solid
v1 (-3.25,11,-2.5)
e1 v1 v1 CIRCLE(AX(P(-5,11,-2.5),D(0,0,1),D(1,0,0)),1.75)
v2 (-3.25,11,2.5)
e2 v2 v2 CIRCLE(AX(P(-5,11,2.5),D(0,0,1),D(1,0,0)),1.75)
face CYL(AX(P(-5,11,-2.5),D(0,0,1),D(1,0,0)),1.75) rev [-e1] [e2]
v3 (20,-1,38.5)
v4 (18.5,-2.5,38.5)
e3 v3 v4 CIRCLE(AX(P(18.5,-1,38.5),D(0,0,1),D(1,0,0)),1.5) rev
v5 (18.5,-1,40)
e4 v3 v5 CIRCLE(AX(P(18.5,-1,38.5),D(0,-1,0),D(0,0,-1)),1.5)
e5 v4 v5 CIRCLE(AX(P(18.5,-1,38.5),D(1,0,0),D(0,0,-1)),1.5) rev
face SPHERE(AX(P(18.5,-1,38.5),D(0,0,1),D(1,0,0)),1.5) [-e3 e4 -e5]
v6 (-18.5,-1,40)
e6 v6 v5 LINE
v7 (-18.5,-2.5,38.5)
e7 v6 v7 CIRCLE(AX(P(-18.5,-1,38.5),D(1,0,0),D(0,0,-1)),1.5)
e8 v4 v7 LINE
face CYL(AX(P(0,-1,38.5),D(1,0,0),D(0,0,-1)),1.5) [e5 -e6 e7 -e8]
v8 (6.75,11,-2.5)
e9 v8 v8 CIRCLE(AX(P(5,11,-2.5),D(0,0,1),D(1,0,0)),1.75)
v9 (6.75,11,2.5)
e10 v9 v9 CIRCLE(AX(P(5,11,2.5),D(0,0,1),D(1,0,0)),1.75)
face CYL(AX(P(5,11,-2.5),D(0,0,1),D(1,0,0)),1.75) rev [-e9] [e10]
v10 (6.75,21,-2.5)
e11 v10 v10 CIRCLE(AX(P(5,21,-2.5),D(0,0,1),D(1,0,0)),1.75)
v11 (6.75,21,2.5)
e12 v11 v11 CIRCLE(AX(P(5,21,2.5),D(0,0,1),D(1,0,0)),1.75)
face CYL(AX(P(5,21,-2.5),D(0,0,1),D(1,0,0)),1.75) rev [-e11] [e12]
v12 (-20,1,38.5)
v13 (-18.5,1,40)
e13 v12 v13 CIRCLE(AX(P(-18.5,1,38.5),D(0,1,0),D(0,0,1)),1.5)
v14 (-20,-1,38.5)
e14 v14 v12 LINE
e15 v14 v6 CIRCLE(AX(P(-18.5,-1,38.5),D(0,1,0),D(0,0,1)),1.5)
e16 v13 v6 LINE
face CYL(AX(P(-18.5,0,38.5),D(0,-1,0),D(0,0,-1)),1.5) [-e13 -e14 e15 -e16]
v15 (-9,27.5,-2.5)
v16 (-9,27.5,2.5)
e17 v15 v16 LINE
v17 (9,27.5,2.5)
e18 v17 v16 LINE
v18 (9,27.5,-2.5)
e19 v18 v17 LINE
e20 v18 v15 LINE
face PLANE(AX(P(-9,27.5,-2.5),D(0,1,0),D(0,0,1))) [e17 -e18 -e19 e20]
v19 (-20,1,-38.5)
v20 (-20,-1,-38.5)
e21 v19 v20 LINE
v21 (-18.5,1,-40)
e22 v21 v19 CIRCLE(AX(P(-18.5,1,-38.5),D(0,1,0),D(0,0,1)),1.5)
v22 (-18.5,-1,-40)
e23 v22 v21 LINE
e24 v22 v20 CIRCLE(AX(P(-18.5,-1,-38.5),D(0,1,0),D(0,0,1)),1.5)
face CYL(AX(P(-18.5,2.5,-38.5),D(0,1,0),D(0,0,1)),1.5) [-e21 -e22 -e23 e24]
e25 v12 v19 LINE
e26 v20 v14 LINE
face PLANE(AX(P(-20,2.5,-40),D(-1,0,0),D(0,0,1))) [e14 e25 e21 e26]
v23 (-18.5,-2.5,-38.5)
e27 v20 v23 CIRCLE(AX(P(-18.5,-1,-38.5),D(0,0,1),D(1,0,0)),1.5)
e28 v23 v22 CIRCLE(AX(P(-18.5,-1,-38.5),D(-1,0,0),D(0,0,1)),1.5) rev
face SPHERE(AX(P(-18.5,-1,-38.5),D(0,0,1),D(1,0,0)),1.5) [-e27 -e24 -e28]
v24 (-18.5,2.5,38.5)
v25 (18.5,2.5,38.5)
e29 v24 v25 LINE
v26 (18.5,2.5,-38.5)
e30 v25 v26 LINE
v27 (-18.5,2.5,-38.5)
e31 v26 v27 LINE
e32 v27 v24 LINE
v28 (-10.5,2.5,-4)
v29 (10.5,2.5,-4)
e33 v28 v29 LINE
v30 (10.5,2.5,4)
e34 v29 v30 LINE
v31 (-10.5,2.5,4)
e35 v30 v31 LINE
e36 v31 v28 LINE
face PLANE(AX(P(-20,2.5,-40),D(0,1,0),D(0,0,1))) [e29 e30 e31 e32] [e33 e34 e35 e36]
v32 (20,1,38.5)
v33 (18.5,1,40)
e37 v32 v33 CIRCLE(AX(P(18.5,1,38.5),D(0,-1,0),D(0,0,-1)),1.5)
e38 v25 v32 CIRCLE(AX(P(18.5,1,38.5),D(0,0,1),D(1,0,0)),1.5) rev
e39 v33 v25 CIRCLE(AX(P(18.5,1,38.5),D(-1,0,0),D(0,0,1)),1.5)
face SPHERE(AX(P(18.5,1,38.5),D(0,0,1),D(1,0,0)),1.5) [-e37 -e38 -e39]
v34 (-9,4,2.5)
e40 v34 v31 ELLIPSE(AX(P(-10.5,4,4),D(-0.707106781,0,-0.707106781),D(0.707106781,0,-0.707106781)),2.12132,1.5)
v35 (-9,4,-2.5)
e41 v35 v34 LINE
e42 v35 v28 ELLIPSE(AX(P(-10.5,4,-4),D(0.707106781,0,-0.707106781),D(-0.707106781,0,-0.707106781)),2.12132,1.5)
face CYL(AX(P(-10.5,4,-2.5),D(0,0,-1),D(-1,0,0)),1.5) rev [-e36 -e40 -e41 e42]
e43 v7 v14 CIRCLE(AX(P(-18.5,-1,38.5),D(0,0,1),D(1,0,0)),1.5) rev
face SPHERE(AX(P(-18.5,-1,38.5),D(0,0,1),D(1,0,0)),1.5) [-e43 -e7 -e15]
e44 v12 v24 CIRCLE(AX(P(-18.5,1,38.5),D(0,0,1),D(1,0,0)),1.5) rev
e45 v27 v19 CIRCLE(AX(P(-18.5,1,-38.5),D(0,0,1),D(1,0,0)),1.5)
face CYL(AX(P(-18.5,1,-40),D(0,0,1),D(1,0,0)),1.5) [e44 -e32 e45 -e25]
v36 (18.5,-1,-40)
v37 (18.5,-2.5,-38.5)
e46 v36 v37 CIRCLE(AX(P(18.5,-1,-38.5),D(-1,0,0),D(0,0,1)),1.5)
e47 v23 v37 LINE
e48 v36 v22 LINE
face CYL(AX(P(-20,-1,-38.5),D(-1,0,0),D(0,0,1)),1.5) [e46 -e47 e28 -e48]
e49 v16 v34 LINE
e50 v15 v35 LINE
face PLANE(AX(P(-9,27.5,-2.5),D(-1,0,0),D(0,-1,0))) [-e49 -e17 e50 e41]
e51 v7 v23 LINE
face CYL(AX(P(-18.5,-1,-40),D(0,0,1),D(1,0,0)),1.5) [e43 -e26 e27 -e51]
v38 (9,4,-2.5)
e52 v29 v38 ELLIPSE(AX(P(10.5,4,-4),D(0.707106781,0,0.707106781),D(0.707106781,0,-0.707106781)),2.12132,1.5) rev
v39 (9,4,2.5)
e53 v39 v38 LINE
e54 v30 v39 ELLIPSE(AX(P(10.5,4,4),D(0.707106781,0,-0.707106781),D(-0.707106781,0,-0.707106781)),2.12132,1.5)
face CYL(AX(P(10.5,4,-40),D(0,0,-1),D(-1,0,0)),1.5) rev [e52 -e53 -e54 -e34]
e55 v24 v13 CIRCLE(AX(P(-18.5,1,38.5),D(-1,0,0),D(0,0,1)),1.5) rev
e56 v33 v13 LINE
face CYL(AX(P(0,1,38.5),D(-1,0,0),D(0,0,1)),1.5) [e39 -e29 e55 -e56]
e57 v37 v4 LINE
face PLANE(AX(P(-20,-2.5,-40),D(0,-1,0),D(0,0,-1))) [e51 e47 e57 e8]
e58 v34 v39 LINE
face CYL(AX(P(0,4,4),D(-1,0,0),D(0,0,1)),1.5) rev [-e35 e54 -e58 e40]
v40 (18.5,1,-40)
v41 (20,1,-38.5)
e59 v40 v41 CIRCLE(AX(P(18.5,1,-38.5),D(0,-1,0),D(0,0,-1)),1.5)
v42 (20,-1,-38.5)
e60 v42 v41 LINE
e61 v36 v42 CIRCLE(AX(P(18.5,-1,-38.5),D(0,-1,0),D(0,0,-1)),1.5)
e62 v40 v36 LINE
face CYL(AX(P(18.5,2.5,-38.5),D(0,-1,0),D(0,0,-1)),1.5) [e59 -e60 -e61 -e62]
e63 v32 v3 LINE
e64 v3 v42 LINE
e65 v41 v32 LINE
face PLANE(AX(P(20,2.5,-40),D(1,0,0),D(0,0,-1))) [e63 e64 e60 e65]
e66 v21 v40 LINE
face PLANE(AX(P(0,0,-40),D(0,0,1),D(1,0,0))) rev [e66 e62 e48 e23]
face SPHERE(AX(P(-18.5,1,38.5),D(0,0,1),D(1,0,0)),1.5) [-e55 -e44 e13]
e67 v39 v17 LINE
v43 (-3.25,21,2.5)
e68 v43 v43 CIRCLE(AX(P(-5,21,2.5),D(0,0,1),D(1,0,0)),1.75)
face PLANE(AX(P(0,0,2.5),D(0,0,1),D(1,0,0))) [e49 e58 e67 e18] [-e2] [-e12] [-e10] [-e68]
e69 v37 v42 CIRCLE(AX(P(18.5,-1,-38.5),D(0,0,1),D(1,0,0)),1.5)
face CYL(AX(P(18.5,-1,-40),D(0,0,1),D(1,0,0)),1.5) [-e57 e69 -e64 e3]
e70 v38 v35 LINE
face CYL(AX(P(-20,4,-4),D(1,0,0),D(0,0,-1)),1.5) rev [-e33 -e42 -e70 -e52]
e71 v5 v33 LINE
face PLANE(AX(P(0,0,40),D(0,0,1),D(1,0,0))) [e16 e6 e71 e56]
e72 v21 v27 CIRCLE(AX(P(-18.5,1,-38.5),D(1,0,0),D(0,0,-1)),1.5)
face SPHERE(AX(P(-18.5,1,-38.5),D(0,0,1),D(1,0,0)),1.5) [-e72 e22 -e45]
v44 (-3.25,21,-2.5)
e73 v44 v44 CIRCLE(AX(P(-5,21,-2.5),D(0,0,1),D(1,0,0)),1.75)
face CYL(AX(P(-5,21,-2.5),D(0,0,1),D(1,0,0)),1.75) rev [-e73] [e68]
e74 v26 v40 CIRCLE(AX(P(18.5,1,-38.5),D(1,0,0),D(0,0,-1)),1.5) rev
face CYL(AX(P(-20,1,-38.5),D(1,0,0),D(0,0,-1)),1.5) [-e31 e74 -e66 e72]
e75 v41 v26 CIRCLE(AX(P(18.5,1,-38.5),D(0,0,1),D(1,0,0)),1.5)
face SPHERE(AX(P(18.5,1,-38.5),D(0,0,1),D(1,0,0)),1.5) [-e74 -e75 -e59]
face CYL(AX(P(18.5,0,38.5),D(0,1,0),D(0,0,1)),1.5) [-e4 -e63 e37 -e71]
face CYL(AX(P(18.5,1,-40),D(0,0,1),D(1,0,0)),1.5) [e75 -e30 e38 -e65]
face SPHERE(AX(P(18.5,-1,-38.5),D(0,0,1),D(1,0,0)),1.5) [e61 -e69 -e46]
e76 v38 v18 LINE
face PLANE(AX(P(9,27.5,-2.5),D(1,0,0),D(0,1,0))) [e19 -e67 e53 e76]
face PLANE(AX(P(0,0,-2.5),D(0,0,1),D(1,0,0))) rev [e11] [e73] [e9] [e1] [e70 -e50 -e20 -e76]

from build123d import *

# Parameters (mm, degrees)
BOSS_EXTRUDE1_DEPTH      = 40
BOSS_EXTRUDE1_DEPTH_BACK = 40
SKETCH1_W                = 40
SKETCH1_H                = 5
BOSS_EXTRUDE2_DEPTH      = 2.5
BOSS_EXTRUDE2_DEPTH_BACK = 2.5
SKETCH2_W                = 18
SKETCH2_H                = 25
SKETCH2_R                = 1.75
FILLET1_R                = 1.5
FILLET2_R                = 1.5
FILLET3_R                = 1.5


with BuildPart() as part:
    # Sketch1 → Boss-Extrude1 (new, two sides: drawn at the far end of the back side and taken through both)
    with BuildSketch(Plane.XY.offset(-BOSS_EXTRUDE1_DEPTH_BACK)):
        Rectangle(SKETCH1_W, SKETCH1_H)
    extrude(amount=BOSS_EXTRUDE1_DEPTH + BOSS_EXTRUDE1_DEPTH_BACK)

    # Sketch2 → Boss-Extrude2 (add, two sides: drawn at the far end of the back side and taken through both)
    with BuildSketch(Plane.XY.offset(-BOSS_EXTRUDE2_DEPTH_BACK)):
        with Locations((0, 15)):
            Rectangle(SKETCH2_W, SKETCH2_H)
        with Locations((-5, 11)):
            Circle(SKETCH2_R, mode=Mode.SUBTRACT)
        with Locations((5, 11)):
            Circle(SKETCH2_R, mode=Mode.SUBTRACT)
        with Locations((5, 21)):
            Circle(SKETCH2_R, mode=Mode.SUBTRACT)
        with Locations((-5, 21)):
            Circle(SKETCH2_R, mode=Mode.SUBTRACT)
    extrude(amount=BOSS_EXTRUDE2_DEPTH + BOSS_EXTRUDE2_DEPTH_BACK)

    # Fillet1
    fillet1_edges = [part.edges().sort_by_distance(p)[0] for p in [
        (0, 2.5, 40),
        (0, -2.5, 40),
        (0, -2.5, -40),
        (9, 2.5, 0),
        (0, 2.5, -2.5),
        (-9, 2.5, 0),
        (0, 2.5, 2.5),
        (20, -2.5, 0),
        (-20, -2.5, 0),
        (-20, 2.5, 0),
        (20, 2.5, 0),
        (0, 2.5, -40),
    ]]
    fillet(fillet1_edges, radius=FILLET1_R)

    # Fillet2
    # the kernel refuses this fillet: 1.5 mm, written as the material it takes off along each edge
    with BuildSketch(Plane(origin=(18.5, 1, 38.5), x_dir=(1, 0, 0), z_dir=(0, 0, 1))) as fillet2_piece_1_section:
        Polygon((0, 0), (FILLET2_R, 0), (FILLET2_R, FILLET2_R), (0, FILLET2_R), align=None)
    fillet2_piece_1 = extrude(amount=FILLET2_R, mode=Mode.PRIVATE)
    fillet2_piece_1 = fillet2_piece_1 - Plane(origin=(18.5, 1, 38.5), x_dir=(-0.7071067811865475, -0.7071067811865475, 0), z_dir=(0, 0, 1)) * Sphere(FILLET2_R, mode=Mode.PRIVATE)
    add(fillet2_piece_1, mode=Mode.SUBTRACT)
    with BuildSketch(Plane(origin=(-18.5, 1, 38.5), x_dir=(-1, 0, 0), z_dir=(0, 0, 1))) as fillet2_piece_2_section:
        Polygon((0, 0), (FILLET2_R, 0), (FILLET2_R, -FILLET2_R), (0, -FILLET2_R), align=None)
    fillet2_piece_2 = extrude(amount=FILLET2_R, mode=Mode.PRIVATE)
    fillet2_piece_2 = fillet2_piece_2 - Plane(origin=(-18.5, 1, 38.5), x_dir=(0.7071067811865475, -0.7071067811865475, 0), z_dir=(0, 0, 1)) * Sphere(FILLET2_R, mode=Mode.PRIVATE)
    add(fillet2_piece_2, mode=Mode.SUBTRACT)
    with BuildSketch(Plane(origin=(-18.5, -1, 38.5), x_dir=(-1, 0, 0), z_dir=(0, 0, 1))) as fillet2_piece_3_section:
        Polygon((0, 0), (FILLET2_R, 0), (FILLET2_R, FILLET2_R), (0, FILLET2_R), align=None)
    fillet2_piece_3 = extrude(amount=FILLET2_R, mode=Mode.PRIVATE)
    fillet2_piece_3 = fillet2_piece_3 - Plane(origin=(-18.5, -1, 38.5), x_dir=(0.7071067811865475, 0.7071067811865475, 0), z_dir=(0, 0, 1)) * Sphere(FILLET2_R, mode=Mode.PRIVATE)
    add(fillet2_piece_3, mode=Mode.SUBTRACT)
    with BuildSketch(Plane(origin=(18.5, -1, 38.5), x_dir=(1, 0, 0), z_dir=(0, 0, 1))) as fillet2_piece_4_section:
        Polygon((0, 0), (FILLET2_R, 0), (FILLET2_R, -FILLET2_R), (0, -FILLET2_R), align=None)
    fillet2_piece_4 = extrude(amount=FILLET2_R, mode=Mode.PRIVATE)
    fillet2_piece_4 = fillet2_piece_4 - Plane(origin=(18.5, -1, 38.5), x_dir=(-0.7071067811865475, 0.7071067811865475, 0), z_dir=(0, 0, 1)) * Sphere(FILLET2_R, mode=Mode.PRIVATE)
    add(fillet2_piece_4, mode=Mode.SUBTRACT)
    with BuildSketch(Plane(origin=(20, 1, 40), x_dir=(-1, 0, 0), z_dir=(0, -1, 0)), Plane(origin=(-20, -1, 40), x_dir=(1, 0, 0), z_dir=(0, 1, 0))) as fillet2_piece_5:
        with BuildLine():
            CenterArc((FILLET2_R, FILLET2_R), FILLET2_R, 180, 90)
            Line((0, FILLET2_R), (0, 0))
            Line((0, 0), (FILLET2_R, 0))
        make_face()
    extrude(amount=2, mode=Mode.SUBTRACT)

    # Fillet3
    # the kernel refuses this fillet: 1.5 mm, written as the material it takes off along each edge
    with BuildSketch(Plane(origin=(18.5, 1, -38.5), x_dir=(0, 0, -1), z_dir=(1, 0, 0))) as fillet3_piece_1_section:
        Polygon((0, 0), (FILLET3_R, 0), (FILLET3_R, FILLET3_R), (0, FILLET3_R), align=None)
    fillet3_piece_1 = extrude(amount=FILLET3_R, mode=Mode.PRIVATE)
    fillet3_piece_1 = fillet3_piece_1 - Plane(origin=(18.5, 1, -38.5), x_dir=(0, -0.7071067811865475, 0.7071067811865475), z_dir=(1, 0, 0)) * Sphere(FILLET3_R, mode=Mode.PRIVATE)
    add(fillet3_piece_1, mode=Mode.SUBTRACT)
    with BuildSketch(Plane(origin=(-18.5, 1, -38.5), x_dir=(0, 0, -1), z_dir=(-1, 0, 0))) as fillet3_piece_2_section:
        Polygon((0, 0), (FILLET3_R, 0), (FILLET3_R, -FILLET3_R), (0, -FILLET3_R), align=None)
    fillet3_piece_2 = extrude(amount=FILLET3_R, mode=Mode.PRIVATE)
    fillet3_piece_2 = fillet3_piece_2 - Plane(origin=(-18.5, 1, -38.5), x_dir=(0, -0.7071067811865475, 0.7071067811865475), z_dir=(-1, 0, 0)) * Sphere(FILLET3_R, mode=Mode.PRIVATE)
    add(fillet3_piece_2, mode=Mode.SUBTRACT)
    with BuildSketch(Plane(origin=(-18.5, -1, -38.5), x_dir=(0, 0, -1), z_dir=(-1, 0, 0))) as fillet3_piece_3_section:
        Polygon((0, 0), (FILLET3_R, 0), (FILLET3_R, FILLET3_R), (0, FILLET3_R), align=None)
    fillet3_piece_3 = extrude(amount=FILLET3_R, mode=Mode.PRIVATE)
    fillet3_piece_3 = fillet3_piece_3 - Plane(origin=(-18.5, -1, -38.5), x_dir=(0, 0.7071067811865475, 0.7071067811865475), z_dir=(-1, 0, 0)) * Sphere(FILLET3_R, mode=Mode.PRIVATE)
    add(fillet3_piece_3, mode=Mode.SUBTRACT)
    with BuildSketch(Plane(origin=(18.5, -1, -38.5), x_dir=(0, 0, -1), z_dir=(1, 0, 0))) as fillet3_piece_4_section:
        Polygon((0, 0), (FILLET3_R, 0), (FILLET3_R, -FILLET3_R), (0, -FILLET3_R), align=None)
    fillet3_piece_4 = extrude(amount=FILLET3_R, mode=Mode.PRIVATE)
    fillet3_piece_4 = fillet3_piece_4 - Plane(origin=(18.5, -1, -38.5), x_dir=(0, 0.7071067811865475, 0.7071067811865475), z_dir=(1, 0, 0)) * Sphere(FILLET3_R, mode=Mode.PRIVATE)
    add(fillet3_piece_4, mode=Mode.SUBTRACT)
    with BuildSketch(Plane(origin=(20, 1, -40), x_dir=(0, 0, 1), z_dir=(0, -1, 0)), Plane(origin=(-20, -1, -40), x_dir=(0, 0, 1), z_dir=(0, 1, 0))) as fillet3_piece_5:
        with BuildLine():
            CenterArc((FILLET3_R, FILLET3_R), FILLET3_R, 180, 90)
            Line((0, FILLET3_R), (0, 0))
            Line((0, 0), (FILLET3_R, 0))
        make_face()
    extrude(amount=2, mode=Mode.SUBTRACT)


solid = part.part
